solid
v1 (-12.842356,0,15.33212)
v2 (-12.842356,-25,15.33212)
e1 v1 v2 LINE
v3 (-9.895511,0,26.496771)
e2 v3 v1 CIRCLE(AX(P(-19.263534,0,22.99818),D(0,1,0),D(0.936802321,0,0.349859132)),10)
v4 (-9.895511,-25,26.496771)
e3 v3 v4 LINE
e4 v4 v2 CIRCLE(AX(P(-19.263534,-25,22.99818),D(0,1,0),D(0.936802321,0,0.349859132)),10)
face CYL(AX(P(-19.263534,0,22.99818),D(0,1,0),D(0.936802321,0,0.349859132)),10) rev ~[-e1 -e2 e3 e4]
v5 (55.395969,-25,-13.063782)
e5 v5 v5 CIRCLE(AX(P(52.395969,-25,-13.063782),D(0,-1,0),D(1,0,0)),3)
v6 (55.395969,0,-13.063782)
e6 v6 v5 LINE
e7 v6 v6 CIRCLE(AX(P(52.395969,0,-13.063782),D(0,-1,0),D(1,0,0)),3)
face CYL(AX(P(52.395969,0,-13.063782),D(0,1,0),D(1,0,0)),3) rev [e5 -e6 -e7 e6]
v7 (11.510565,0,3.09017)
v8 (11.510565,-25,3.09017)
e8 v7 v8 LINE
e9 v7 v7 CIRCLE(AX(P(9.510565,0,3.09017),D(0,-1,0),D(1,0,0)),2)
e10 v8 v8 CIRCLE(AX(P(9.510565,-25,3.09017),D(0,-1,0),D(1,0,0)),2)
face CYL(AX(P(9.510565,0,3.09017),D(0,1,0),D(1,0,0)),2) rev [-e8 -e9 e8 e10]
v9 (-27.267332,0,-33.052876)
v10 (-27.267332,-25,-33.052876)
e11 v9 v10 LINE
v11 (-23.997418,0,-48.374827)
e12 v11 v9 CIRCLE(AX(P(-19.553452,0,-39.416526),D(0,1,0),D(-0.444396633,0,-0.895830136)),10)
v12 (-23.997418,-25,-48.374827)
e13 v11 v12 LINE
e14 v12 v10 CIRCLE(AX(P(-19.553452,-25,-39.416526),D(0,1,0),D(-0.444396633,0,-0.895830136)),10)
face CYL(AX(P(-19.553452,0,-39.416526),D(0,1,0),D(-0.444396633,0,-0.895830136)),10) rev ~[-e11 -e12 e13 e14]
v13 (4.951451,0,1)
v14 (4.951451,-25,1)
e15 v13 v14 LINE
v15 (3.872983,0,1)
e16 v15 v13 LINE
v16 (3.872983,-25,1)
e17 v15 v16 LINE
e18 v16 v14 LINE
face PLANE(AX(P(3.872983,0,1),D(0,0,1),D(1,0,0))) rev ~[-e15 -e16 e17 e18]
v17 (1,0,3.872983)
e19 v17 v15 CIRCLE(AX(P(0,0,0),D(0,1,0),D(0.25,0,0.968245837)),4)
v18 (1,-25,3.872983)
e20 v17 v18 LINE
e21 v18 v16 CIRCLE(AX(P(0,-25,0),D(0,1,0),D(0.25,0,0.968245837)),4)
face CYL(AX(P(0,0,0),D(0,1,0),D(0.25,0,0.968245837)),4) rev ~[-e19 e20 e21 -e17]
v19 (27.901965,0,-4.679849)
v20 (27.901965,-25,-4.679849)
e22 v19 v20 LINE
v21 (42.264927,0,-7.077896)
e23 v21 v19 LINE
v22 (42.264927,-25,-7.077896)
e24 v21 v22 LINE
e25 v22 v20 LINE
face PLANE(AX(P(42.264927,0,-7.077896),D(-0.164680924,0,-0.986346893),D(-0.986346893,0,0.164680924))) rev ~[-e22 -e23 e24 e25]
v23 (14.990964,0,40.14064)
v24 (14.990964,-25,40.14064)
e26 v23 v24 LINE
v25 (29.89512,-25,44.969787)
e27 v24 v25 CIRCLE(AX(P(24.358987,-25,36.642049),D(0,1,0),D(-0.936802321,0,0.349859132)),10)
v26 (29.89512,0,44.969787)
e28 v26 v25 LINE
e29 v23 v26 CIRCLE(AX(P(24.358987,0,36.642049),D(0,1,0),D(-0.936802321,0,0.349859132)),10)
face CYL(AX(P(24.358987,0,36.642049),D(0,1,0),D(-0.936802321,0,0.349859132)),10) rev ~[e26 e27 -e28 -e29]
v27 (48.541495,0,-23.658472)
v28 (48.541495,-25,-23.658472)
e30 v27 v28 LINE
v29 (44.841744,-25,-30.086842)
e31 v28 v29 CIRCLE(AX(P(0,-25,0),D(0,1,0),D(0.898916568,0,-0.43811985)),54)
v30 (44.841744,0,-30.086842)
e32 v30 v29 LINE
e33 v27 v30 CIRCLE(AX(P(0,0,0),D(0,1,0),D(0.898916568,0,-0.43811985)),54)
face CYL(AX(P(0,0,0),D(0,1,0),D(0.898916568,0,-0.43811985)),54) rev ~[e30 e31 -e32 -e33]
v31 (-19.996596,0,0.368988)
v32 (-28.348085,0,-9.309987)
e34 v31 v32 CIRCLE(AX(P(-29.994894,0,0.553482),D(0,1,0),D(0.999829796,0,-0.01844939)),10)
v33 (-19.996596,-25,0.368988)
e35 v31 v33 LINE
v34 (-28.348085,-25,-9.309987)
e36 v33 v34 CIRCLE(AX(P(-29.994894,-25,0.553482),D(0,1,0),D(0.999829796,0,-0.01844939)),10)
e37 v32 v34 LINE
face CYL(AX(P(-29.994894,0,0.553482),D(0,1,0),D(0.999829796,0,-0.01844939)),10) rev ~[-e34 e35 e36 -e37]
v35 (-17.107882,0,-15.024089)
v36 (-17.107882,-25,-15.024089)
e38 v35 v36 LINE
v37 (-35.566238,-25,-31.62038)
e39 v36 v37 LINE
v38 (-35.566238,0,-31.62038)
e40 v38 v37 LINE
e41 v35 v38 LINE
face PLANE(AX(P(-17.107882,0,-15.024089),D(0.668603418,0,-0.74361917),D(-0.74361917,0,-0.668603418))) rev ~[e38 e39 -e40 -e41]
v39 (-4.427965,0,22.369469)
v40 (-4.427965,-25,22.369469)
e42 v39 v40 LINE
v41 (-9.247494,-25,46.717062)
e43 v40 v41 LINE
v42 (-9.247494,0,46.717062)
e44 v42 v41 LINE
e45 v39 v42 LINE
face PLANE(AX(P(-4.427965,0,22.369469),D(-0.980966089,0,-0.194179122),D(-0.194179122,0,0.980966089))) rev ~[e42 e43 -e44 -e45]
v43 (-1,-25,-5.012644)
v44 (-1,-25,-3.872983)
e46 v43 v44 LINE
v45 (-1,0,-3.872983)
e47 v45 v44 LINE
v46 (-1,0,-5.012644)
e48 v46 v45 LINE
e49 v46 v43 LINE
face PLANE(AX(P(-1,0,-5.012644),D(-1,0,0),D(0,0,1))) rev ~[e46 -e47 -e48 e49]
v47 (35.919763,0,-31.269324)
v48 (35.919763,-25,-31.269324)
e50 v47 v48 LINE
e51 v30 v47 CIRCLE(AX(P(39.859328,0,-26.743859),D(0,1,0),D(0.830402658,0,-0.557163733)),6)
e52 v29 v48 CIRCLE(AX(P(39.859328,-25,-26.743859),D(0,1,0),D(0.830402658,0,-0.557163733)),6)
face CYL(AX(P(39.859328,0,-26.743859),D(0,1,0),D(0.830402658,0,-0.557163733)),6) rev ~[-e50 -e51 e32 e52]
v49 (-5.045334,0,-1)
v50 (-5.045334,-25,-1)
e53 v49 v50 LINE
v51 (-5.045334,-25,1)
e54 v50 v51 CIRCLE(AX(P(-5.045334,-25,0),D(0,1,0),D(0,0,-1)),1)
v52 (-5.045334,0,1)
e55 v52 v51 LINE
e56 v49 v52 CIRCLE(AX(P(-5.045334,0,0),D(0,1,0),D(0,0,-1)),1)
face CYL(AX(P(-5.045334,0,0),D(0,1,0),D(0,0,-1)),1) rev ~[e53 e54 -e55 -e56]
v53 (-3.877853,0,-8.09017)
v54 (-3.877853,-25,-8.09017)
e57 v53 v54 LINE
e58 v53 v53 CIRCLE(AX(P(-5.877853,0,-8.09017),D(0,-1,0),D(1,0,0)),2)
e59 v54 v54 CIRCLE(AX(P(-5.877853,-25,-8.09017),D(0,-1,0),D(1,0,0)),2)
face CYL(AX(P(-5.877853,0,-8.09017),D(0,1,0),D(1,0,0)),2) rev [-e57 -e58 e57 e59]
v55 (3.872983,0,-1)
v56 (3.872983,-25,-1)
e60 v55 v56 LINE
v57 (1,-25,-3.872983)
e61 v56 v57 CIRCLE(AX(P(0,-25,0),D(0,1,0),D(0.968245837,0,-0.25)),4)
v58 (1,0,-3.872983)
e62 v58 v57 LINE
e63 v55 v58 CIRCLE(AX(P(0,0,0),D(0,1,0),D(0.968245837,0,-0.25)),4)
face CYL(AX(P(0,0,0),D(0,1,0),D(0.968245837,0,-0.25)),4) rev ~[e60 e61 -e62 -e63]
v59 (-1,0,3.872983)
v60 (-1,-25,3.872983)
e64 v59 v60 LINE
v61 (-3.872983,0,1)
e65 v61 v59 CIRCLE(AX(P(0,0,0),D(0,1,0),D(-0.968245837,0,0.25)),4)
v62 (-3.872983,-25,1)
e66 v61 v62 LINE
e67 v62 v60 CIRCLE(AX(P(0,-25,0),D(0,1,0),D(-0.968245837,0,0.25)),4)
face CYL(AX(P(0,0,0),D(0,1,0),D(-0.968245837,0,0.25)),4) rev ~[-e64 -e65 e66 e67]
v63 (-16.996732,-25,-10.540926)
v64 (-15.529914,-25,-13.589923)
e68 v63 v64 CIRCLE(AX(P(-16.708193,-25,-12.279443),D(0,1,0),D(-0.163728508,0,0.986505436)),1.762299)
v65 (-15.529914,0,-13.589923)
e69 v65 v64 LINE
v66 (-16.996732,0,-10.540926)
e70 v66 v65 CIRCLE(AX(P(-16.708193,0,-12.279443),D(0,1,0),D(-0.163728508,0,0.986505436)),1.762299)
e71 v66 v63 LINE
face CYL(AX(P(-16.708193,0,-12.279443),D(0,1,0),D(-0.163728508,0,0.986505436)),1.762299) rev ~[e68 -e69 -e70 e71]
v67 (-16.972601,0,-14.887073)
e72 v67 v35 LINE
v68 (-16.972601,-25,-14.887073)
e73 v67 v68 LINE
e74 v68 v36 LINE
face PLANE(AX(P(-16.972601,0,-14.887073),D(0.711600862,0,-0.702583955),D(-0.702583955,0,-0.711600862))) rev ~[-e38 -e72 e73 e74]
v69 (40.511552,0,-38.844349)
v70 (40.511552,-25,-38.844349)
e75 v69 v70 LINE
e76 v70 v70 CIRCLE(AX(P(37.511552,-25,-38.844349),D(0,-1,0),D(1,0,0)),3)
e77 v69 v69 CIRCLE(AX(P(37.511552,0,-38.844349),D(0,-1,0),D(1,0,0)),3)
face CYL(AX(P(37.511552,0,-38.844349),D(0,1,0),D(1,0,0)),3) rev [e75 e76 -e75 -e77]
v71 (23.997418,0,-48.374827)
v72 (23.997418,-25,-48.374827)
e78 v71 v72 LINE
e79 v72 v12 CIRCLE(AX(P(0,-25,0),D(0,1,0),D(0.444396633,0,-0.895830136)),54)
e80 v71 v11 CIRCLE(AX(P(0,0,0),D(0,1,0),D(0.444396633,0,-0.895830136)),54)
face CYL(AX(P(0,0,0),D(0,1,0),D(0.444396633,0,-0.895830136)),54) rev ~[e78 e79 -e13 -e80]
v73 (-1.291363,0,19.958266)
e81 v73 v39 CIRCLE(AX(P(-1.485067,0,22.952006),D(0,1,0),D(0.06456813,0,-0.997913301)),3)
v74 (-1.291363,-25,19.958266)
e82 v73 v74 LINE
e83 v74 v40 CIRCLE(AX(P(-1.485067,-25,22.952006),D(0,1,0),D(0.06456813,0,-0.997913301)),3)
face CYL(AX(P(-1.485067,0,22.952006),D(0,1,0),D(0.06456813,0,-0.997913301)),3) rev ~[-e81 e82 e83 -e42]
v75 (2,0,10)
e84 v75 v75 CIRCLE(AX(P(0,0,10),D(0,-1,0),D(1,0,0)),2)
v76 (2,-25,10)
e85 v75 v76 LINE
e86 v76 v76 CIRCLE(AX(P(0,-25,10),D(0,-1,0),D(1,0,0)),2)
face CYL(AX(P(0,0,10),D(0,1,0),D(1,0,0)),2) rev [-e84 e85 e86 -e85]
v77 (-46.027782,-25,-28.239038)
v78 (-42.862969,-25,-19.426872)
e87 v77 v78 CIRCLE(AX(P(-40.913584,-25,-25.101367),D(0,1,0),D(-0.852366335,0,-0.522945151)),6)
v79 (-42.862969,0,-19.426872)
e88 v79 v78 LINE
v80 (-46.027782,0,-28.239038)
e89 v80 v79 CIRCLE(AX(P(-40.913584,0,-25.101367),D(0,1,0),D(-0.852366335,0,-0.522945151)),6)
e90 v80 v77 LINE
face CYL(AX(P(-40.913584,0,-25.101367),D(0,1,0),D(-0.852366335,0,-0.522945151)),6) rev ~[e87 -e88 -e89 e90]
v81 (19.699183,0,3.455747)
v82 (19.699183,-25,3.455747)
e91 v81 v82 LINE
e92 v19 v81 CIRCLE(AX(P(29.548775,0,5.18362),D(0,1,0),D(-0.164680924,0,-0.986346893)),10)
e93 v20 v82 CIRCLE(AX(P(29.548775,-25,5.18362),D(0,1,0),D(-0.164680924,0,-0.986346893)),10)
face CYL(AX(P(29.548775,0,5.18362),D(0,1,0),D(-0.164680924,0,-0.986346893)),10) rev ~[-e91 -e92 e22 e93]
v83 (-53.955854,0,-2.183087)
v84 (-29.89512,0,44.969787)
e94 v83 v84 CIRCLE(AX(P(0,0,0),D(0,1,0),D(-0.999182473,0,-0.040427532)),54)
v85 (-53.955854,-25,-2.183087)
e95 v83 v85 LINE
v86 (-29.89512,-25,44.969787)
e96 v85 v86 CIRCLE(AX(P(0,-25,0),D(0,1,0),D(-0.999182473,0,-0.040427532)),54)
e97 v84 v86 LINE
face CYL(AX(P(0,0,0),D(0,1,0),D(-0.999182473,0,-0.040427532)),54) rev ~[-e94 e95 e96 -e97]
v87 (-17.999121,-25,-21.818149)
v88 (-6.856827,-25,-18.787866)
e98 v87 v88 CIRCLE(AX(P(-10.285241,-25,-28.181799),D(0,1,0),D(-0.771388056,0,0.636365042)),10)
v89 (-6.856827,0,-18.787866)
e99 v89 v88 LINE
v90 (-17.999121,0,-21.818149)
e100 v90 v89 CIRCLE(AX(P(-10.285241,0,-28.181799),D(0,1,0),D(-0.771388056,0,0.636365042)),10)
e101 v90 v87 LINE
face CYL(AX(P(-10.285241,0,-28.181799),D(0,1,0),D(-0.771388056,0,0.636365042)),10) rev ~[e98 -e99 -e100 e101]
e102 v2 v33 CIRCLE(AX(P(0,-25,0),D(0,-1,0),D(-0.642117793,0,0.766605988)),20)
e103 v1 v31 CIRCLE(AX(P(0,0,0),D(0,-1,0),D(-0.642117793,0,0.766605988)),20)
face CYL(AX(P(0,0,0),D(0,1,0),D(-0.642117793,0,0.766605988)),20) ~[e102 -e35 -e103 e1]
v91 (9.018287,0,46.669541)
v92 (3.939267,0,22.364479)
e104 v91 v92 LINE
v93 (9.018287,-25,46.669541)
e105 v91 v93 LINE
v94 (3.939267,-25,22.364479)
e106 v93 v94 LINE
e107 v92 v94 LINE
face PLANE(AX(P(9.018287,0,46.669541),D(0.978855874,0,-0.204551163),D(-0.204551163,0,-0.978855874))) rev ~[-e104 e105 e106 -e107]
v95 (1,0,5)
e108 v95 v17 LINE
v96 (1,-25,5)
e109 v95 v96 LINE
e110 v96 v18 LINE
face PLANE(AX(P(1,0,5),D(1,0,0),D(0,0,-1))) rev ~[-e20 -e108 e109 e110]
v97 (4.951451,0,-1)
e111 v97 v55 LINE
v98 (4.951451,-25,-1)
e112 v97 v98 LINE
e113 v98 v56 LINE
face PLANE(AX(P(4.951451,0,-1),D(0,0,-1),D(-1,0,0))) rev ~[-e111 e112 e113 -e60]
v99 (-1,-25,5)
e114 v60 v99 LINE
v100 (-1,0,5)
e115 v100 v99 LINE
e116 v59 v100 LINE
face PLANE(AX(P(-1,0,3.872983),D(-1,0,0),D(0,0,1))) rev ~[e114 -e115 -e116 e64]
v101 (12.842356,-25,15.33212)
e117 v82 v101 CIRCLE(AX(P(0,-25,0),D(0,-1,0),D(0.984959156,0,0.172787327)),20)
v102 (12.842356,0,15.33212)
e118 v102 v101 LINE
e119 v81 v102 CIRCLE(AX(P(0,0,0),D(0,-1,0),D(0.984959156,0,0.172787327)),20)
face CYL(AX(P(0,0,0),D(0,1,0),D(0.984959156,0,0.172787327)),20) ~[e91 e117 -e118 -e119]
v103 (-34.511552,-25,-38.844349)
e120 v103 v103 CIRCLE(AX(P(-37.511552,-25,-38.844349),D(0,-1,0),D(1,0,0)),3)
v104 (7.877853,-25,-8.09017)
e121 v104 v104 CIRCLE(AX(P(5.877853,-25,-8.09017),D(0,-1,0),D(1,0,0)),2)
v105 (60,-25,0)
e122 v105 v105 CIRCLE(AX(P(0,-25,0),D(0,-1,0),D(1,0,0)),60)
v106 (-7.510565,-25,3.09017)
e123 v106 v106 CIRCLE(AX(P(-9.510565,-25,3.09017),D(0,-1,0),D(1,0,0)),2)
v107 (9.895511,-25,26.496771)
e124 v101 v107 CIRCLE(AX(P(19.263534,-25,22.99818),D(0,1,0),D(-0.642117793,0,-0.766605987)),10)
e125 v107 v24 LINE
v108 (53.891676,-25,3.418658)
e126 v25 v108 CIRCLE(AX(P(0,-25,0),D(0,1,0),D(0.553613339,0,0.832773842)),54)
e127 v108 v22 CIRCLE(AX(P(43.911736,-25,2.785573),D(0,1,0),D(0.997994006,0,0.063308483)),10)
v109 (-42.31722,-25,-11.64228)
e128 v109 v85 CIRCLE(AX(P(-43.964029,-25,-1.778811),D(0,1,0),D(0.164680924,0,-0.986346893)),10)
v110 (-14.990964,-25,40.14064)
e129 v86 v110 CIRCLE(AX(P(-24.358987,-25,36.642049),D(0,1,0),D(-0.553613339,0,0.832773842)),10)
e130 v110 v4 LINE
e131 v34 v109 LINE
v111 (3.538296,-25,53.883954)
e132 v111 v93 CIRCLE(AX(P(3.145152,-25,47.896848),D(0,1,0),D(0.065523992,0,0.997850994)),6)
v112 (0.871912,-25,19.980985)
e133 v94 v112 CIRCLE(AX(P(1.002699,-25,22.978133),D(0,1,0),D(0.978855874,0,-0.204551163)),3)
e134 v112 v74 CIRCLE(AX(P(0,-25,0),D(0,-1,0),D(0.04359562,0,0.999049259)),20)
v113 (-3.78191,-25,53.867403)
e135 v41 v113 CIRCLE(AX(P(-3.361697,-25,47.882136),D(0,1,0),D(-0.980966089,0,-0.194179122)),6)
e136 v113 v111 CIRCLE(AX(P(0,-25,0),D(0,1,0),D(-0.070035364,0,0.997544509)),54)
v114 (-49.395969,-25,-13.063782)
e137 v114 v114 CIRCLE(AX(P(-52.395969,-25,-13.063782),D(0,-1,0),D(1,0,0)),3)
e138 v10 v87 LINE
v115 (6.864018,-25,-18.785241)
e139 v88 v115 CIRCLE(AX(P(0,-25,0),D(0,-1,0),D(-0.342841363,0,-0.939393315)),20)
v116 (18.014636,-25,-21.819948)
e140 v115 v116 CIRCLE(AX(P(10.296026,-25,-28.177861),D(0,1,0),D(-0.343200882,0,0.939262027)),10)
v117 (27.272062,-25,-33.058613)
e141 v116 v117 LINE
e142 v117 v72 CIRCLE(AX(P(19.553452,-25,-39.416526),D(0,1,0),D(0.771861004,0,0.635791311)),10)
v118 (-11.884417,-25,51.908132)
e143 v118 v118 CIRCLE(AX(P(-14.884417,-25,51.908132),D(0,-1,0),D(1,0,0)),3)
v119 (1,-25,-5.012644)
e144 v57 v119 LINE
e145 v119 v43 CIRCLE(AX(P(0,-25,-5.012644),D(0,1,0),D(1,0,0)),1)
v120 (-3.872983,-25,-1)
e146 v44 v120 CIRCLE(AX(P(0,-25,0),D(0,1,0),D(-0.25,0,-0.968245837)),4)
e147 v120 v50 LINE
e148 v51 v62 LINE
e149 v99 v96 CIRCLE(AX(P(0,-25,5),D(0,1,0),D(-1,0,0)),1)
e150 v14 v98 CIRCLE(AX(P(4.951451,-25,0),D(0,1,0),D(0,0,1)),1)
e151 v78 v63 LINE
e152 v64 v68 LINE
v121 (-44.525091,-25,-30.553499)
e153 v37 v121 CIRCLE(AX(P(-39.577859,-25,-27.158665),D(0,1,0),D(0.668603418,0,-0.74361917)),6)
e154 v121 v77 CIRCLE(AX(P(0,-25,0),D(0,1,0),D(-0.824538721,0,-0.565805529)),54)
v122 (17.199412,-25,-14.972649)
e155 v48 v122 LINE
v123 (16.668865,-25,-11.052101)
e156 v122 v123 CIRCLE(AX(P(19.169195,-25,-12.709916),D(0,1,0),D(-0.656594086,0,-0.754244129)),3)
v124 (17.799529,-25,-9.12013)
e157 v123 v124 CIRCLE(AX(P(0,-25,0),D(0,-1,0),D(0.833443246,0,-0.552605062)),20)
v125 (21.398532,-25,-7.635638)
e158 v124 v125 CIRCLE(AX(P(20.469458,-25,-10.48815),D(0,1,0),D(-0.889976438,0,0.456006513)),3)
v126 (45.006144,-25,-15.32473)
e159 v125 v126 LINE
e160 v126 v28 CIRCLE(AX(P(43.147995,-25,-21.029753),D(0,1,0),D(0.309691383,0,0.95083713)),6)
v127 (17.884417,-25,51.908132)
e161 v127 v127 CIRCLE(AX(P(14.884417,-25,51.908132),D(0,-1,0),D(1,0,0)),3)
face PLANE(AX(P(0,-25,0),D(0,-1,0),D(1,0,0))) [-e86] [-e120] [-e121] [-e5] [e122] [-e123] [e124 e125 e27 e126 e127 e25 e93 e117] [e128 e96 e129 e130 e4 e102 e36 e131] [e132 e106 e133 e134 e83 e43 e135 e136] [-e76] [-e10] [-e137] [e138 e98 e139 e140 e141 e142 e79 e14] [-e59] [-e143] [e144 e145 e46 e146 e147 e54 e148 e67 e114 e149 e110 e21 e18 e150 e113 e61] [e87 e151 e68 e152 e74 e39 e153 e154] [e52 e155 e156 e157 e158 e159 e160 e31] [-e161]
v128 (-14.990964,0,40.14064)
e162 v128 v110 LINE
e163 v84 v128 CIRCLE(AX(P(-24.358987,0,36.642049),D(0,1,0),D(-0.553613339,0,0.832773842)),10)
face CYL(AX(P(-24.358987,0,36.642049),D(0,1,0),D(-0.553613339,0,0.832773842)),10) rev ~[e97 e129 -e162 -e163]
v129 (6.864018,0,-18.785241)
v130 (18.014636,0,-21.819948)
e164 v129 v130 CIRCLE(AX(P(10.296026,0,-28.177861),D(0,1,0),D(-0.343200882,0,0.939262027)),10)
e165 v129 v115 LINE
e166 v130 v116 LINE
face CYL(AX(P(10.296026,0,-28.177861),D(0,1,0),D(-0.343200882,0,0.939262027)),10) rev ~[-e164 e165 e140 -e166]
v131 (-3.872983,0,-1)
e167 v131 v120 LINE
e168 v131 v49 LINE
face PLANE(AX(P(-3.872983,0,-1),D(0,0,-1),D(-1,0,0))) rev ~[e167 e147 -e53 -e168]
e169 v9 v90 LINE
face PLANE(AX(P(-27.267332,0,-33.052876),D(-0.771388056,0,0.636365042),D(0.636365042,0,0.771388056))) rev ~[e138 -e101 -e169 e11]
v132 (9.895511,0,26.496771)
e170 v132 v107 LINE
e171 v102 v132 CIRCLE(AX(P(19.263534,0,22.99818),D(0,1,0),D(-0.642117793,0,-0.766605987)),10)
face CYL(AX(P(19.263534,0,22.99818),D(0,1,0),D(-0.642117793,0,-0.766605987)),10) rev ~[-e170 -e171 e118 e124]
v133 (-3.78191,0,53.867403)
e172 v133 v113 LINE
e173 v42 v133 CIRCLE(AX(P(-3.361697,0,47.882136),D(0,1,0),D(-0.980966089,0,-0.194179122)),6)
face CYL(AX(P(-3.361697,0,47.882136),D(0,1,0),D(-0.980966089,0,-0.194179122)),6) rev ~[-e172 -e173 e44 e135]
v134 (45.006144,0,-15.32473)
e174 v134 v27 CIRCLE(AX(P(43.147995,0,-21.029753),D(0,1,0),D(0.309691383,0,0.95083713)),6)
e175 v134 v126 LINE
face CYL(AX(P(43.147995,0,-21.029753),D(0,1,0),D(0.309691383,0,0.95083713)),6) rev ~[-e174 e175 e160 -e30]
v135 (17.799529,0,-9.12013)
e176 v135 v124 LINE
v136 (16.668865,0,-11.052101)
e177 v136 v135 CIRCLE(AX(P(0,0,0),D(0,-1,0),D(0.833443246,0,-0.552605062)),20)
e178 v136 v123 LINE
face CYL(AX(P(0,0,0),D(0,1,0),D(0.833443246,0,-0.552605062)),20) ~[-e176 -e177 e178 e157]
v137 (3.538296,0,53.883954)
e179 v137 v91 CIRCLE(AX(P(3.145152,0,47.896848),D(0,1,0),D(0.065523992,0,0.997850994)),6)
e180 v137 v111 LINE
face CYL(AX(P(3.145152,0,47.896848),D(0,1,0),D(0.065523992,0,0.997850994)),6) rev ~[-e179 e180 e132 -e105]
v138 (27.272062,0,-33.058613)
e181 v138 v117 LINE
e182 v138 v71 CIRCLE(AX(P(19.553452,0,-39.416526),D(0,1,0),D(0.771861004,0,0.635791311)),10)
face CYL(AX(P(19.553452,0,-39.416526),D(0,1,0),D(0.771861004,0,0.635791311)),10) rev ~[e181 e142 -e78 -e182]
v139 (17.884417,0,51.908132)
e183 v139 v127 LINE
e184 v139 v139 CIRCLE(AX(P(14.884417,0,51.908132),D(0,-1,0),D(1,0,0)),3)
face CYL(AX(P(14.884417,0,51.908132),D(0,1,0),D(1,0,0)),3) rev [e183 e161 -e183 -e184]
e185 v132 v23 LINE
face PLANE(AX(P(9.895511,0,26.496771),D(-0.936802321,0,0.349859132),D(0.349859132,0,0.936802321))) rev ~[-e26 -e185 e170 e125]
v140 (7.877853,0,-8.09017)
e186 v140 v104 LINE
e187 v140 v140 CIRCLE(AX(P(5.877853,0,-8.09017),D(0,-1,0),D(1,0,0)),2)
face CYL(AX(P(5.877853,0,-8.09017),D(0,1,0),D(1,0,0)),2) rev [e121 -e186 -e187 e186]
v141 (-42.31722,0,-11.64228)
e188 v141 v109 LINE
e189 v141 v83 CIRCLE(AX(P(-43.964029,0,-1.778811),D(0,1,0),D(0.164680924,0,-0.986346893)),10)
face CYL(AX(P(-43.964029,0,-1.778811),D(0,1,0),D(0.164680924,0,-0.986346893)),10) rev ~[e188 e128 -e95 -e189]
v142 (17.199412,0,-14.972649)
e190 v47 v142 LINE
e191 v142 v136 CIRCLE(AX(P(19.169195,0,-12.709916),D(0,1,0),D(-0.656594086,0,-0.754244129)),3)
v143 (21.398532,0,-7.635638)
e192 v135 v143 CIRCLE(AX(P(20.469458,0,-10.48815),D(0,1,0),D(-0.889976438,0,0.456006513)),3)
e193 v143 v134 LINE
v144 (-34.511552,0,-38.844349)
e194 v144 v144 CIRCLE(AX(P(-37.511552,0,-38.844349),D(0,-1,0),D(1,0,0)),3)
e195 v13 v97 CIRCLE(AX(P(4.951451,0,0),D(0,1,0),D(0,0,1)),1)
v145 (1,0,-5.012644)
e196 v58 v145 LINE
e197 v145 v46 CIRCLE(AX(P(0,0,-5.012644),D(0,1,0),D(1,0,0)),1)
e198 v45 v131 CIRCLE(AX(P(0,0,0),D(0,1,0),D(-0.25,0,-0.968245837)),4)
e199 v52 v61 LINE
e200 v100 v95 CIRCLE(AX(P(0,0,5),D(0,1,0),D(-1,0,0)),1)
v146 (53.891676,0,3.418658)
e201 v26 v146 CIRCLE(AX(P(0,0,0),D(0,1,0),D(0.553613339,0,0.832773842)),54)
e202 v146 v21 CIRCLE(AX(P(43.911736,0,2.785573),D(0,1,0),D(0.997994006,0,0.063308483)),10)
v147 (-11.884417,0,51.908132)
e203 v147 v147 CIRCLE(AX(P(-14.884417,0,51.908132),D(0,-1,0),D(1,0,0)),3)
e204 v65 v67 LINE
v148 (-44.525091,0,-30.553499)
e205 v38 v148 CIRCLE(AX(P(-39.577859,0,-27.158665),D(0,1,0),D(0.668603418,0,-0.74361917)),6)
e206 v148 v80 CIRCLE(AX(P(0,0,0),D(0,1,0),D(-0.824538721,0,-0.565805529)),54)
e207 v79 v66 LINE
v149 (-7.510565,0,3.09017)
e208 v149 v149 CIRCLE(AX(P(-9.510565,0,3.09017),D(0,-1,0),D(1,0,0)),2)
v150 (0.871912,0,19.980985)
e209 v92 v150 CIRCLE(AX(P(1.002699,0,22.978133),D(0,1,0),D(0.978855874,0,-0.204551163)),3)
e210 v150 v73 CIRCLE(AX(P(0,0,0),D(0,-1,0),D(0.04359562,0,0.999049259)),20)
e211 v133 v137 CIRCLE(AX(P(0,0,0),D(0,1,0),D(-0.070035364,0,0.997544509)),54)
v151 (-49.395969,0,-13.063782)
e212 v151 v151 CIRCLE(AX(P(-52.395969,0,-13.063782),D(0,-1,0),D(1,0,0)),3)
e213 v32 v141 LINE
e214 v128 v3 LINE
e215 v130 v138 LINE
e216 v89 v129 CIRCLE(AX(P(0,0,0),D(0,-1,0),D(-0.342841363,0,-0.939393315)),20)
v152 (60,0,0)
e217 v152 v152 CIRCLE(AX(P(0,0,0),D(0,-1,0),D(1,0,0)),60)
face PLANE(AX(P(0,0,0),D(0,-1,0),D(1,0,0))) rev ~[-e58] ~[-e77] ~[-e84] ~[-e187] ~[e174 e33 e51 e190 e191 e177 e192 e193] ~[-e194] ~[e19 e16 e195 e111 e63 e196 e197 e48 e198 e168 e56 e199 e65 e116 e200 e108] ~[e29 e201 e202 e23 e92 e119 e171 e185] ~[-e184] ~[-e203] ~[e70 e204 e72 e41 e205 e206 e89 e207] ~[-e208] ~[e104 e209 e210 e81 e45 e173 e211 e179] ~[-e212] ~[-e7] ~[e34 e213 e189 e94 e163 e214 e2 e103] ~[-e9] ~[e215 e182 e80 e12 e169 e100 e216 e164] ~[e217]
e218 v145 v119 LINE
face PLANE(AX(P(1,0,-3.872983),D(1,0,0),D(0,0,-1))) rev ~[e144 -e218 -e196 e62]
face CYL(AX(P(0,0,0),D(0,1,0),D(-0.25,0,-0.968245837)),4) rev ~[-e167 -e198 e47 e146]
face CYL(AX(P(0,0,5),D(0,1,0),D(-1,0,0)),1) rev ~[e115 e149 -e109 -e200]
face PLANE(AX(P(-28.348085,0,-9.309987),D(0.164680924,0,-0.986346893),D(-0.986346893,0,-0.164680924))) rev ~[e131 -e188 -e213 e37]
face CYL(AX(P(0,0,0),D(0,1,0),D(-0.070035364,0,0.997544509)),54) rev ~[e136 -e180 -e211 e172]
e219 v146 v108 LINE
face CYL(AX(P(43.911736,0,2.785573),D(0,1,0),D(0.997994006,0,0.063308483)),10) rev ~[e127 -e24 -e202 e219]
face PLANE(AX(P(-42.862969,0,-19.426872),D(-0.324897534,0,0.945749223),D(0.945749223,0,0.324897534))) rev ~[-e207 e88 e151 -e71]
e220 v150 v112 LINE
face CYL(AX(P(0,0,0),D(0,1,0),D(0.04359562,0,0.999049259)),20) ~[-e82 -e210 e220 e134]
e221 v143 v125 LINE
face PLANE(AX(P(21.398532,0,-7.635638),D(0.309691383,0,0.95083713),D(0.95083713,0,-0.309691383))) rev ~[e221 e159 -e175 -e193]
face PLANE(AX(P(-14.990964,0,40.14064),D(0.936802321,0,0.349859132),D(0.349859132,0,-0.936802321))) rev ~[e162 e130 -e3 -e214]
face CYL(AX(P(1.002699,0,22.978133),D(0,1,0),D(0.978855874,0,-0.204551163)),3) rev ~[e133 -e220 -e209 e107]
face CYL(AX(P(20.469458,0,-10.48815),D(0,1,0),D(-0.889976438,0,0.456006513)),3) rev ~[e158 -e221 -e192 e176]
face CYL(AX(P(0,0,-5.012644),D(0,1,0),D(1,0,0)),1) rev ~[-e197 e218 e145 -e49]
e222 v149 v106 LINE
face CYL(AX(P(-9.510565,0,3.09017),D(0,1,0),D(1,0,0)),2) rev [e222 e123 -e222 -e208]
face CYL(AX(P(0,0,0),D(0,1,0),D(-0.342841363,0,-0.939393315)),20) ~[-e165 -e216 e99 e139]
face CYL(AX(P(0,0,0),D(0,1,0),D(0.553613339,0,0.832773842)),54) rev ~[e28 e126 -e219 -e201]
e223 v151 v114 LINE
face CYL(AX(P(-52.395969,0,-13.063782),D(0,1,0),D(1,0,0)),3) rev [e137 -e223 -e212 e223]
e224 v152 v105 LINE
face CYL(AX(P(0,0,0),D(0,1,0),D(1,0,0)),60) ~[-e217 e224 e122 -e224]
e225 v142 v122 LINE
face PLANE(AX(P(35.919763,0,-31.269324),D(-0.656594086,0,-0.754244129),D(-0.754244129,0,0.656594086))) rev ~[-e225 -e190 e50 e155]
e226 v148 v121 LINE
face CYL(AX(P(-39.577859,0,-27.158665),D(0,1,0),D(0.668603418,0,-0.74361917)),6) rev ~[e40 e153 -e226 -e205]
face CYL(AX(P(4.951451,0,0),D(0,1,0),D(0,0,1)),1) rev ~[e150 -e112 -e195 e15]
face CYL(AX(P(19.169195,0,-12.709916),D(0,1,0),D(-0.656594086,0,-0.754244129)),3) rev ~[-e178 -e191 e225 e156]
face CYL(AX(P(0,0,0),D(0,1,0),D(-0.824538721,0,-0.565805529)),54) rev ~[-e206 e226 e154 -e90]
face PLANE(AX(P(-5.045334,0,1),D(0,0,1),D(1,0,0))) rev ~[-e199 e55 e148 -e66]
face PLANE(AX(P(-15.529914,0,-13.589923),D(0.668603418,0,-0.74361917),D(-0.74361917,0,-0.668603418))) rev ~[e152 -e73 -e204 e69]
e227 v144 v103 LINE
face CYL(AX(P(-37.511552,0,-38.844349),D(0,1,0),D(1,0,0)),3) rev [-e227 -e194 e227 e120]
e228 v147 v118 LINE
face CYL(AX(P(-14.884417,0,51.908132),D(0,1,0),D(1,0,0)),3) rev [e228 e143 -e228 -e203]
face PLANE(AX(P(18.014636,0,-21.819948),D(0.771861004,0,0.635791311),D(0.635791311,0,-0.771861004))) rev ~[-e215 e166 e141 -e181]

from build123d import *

# Parameters (mm, degrees)
F0_R     = 60
F0_R_2   = 3
F0_R_3   = 15
F0_R_4   = 2
F1_DEPTH = 25


# Not quite as in the source:
# - a feature names something its author has since deleted; it is built from what else it names


with BuildPart() as f1:
    # F0 (on Front) → F1 (new body)
    with BuildSketch(Plane.XZ):
        Circle(F0_R)
        with Locations((-37.5115520048, -38.8443492183)):
            Circle(F0_R_2, mode=Mode.SUBTRACT)
        with BuildLine():
            ThreePointArc((-17.9991214641, -21.8181490168), (-12.909542723, -18.5322896083), (-6.8568272685, -18.7878662921))
            ThreePointArc((-6.8568272685, -18.7878662921), (0.003827401, -19.9999996338), (6.864017636, -18.7852405333))
            ThreePointArc((6.864017636, -18.7852405333), (12.9220689894, -18.5288245474), (18.0146364939, -21.8199476948))
            Line((18.0146364939, -21.8199476948), (27.2720618955, -33.0586128775))
            ThreePointArc((27.2720618955, -33.0586128775), (29.3324432338, -41.5072979988), (23.9974181864, -48.3748273422))
            ThreePointArc((23.9974181864, -48.3748273422), (0, -54), (-23.9974181864, -48.3748273422))
            ThreePointArc((-23.9974181864, -48.3748273422), (-29.3332198415, -41.5036623321), (-27.2673324169, -33.0528755612))
            Line((-27.2673324169, -33.0528755612), (-17.9991214641, -21.8181490168))
        make_face(mode=Mode.SUBTRACT)
        with BuildLine():
            ThreePointArc((-44.5250909536, -30.5534985815), (-45.2912230512, -29.4058687089), (-46.0277820813, -28.2390381684))
            ThreePointArc((-46.0277820813, -28.2390381684), (-46.5604522686, -23.0733436974), (-42.8629692739, -19.4268719232))
            Line((-42.8629692739, -19.4268719232), (-16.9967316552, -10.5409256254))
            ThreePointArc((-16.9967316552, -10.5409256254), (-15.120110809, -11.5154453431), (-15.5299138764, -13.5899226089))
            Line((-15.5299138764, -13.5899226089), (-16.9726013847, -14.8870728677))
            Line((-16.9726013847, -14.8870728677), (-17.1078816805, -15.0240893401))
            Line((-17.1078816805, -15.0240893401), (-35.5662381193, -31.6203804252))
            ThreePointArc((-35.5662381193, -31.6203804252), (-40.2873666152, -33.116567588), (-44.5250909536, -30.5534985815))
        make_face(mode=Mode.SUBTRACT)
        with Locations((-52.3959692189, -13.0637823624)):
            Circle(F0_R_2, mode=Mode.SUBTRACT)
        with Locations((37.5115520048, -38.8443492183)):
            Circle(F0_R_2, mode=Mode.SUBTRACT)
        with BuildLine():
            Line((21.3985322272, -7.6356383993), (45.0061435827, -15.3247300238))
            ThreePointArc((45.0061435827, -15.3247300238), (48.6715278542, -18.6865524369), (48.5414946952, -23.6584719025))
            ThreePointArc((48.5414946952, -23.6584719025), (46.8021183332, -26.9362528857), (44.8417435514, -30.0868415635))
            ThreePointArc((44.8417435514, -30.0868415635), (40.6476491874, -32.6918461445), (35.9197630861, -31.2693239428))
            Line((35.9197630861, -31.2693239428), (17.1994124126, -14.9726488191))
            ThreePointArc((17.1994124126, -14.9726488191), (16.1962922773, -13.1122239789), (16.6688649306, -11.0521012448))
            ThreePointArc((16.6688649306, -11.0521012448), (17.2612476069, -10.1019468943), (17.7995287636, -9.1201302509))
            ThreePointArc((17.7995287636, -9.1201302509), (19.3255292381, -7.7148076154), (21.3985322272, -7.6356383993))
        make_face(mode=Mode.SUBTRACT)
        with Locations((52.3959692189, -13.0637823624)):
            Circle(F0_R_2, mode=Mode.SUBTRACT)
        with BuildLine():
            Line((-14.9909636957, 40.1406403471), (-9.8955105801, 26.4967709421))
            ThreePointArc((-9.8955105801, 26.4967709421), (-9.5946622296, 20.4461367535), (-12.8423558576, 15.3321197499))
            ThreePointArc((-12.8423558576, 15.3321197499), (-18.0436420311, 8.6271074095), (-19.9965959104, 0.3689877998))
            ThreePointArc((-19.9965959104, 0.3689877998), (-22.4237136521, -5.9792994979), (-28.3480846215, -9.3099872294))
            Line((-28.3480846215, -9.3099872294), (-42.3172195747, -11.6422803342))
            ThreePointArc((-42.3172195747, -11.6422803342), (-50.2710809676, -9.5390364788), (-53.9558535504, -2.1830867246))
            ThreePointArc((-53.9558535504, -2.1830867246), (-48.0998424018, 24.5439434672), (-29.8951202889, 44.9697874457))
            ThreePointArc((-29.8951202889, 44.9697874457), (-21.276616009, 46.1551447236), (-14.9909636957, 40.1406403471))
        make_face(mode=Mode.SUBTRACT)
        with BuildLine():
            Line((-4.4279652677, 22.3694685585), (-9.2474940163, 46.7170617057))
            ThreePointArc((-9.2474940163, 46.7170617057), (-8.1285920064, 51.5258593406), (-3.7819096653, 53.8674034949))
            ThreePointArc((-3.7819096653, 53.8674034949), (-0.1220878193, 53.9998619865), (3.5382955571, 53.8839536834))
            ThreePointArc((3.5382955571, 53.8839536834), (7.9230697986, 51.5261035304), (9.0182868498, 46.6695407434))
            Line((9.0182868498, 46.6695407434), (3.9392668723, 22.3644794699))
            ThreePointArc((3.9392668723, 22.3644794699), (2.8434498256, 20.6092434876), (0.8719123918, 19.9809851804))
            ThreePointArc((0.8719123918, 19.9809851804), (-0.2100325239, 19.9988971281), (-1.2913626084, 19.9582660222))
            ThreePointArc((-1.2913626084, 19.9582660222), (-3.31345185, 20.5735591973), (-4.4279652677, 22.3694685585))
        make_face(mode=Mode.SUBTRACT)
        with Locations((-14.8844172141, 51.9081315807)):
            Circle(F0_R_2, mode=Mode.SUBTRACT)
        Circle(F0_R_3, mode=Mode.SUBTRACT)
        with BuildLine():
            ThreePointArc((12.8423558576, 15.3321197499), (9.5946622296, 20.4461367535), (9.8955105801, 26.4967709421))
            Line((9.8955105801, 26.4967709421), (14.9909636957, 40.1406403471))
            ThreePointArc((14.9909636957, 40.1406403471), (21.276616009, 46.1551447236), (29.8951202889, 44.9697874457))
            ThreePointArc((29.8951202889, 44.9697874457), (46.7619600734, 27.0059084294), (53.8916763243, 3.4186580637))
            ThreePointArc((53.8916763243, 3.4186580637), (50.6128315094, -4.6370491105), (42.2649270201, -7.0778956919))
            Line((42.2649270201, -7.0778956919), (27.9019654451, -4.6798491157))
            ThreePointArc((27.9019654451, -4.6798491157), (22.506844055, -1.9164656047), (19.6991831261, 3.4557465422))
            ThreePointArc((19.6991831261, 3.4557465422), (17.3205080757, 10), (12.8423558576, 15.3321197499))
        make_face(mode=Mode.SUBTRACT)
        with Locations((14.8844172141, 51.9081315807)):
            Circle(F0_R_2, mode=Mode.SUBTRACT)
        Circle(F0_R_3)
        with Locations((-5.8778525229, -8.0901699437)):
            Circle(F0_R_4, mode=Mode.SUBTRACT)
        with BuildLine():
            ThreePointArc((-3.8729833462, 1), (-2.8284271247, 2.8284271247), (-1, 3.8729833462))
            Line((-1, 3.8729833462), (-1, 5))
            ThreePointArc((-1, 5), (0, 6), (1, 5))
            Line((1, 5), (1, 3.8729833462))
            ThreePointArc((1, 3.8729833462), (2.8284271247, 2.8284271247), (3.8729833462, 1))
            Line((3.8729833462, 1), (4.9514505081, 1))
            ThreePointArc((4.9514505081, 1), (5.9514505081, 0), (4.9514505081, -1))
            Line((4.9514505081, -1), (3.8729833462, -1))
            ThreePointArc((3.8729833462, -1), (2.8284271247, -2.8284271247), (1, -3.8729833462))
            Line((1, -3.8729833462), (1, -5.0126444548))
            ThreePointArc((1, -5.0126444548), (0, -6.0126444548), (-1, -5.0126444548))
            Line((-1, -5.0126444548), (-1, -3.8729833462))
            ThreePointArc((-1, -3.8729833462), (-2.8284271247, -2.8284271247), (-3.8729833462, -1))
            Line((-3.8729833462, -1), (-5.0453338772, -1))
            ThreePointArc((-5.0453338772, -1), (-6.0453338772, 0), (-5.0453338772, 1))
            Line((-5.0453338772, 1), (-3.8729833462, 1))
        make_face(mode=Mode.SUBTRACT)
        with Locations((5.8778525229, -8.0901699437)):
            Circle(F0_R_4, mode=Mode.SUBTRACT)
        with Locations((-9.510565163, 3.0901699437)):
            Circle(F0_R_4, mode=Mode.SUBTRACT)
        with Locations((9.510565163, 3.0901699437)):
            Circle(F0_R_4, mode=Mode.SUBTRACT)
        with Locations((0, 10)):
            Circle(F0_R_4, mode=Mode.SUBTRACT)
    extrude(amount=F1_DEPTH)


solid = f1.part
